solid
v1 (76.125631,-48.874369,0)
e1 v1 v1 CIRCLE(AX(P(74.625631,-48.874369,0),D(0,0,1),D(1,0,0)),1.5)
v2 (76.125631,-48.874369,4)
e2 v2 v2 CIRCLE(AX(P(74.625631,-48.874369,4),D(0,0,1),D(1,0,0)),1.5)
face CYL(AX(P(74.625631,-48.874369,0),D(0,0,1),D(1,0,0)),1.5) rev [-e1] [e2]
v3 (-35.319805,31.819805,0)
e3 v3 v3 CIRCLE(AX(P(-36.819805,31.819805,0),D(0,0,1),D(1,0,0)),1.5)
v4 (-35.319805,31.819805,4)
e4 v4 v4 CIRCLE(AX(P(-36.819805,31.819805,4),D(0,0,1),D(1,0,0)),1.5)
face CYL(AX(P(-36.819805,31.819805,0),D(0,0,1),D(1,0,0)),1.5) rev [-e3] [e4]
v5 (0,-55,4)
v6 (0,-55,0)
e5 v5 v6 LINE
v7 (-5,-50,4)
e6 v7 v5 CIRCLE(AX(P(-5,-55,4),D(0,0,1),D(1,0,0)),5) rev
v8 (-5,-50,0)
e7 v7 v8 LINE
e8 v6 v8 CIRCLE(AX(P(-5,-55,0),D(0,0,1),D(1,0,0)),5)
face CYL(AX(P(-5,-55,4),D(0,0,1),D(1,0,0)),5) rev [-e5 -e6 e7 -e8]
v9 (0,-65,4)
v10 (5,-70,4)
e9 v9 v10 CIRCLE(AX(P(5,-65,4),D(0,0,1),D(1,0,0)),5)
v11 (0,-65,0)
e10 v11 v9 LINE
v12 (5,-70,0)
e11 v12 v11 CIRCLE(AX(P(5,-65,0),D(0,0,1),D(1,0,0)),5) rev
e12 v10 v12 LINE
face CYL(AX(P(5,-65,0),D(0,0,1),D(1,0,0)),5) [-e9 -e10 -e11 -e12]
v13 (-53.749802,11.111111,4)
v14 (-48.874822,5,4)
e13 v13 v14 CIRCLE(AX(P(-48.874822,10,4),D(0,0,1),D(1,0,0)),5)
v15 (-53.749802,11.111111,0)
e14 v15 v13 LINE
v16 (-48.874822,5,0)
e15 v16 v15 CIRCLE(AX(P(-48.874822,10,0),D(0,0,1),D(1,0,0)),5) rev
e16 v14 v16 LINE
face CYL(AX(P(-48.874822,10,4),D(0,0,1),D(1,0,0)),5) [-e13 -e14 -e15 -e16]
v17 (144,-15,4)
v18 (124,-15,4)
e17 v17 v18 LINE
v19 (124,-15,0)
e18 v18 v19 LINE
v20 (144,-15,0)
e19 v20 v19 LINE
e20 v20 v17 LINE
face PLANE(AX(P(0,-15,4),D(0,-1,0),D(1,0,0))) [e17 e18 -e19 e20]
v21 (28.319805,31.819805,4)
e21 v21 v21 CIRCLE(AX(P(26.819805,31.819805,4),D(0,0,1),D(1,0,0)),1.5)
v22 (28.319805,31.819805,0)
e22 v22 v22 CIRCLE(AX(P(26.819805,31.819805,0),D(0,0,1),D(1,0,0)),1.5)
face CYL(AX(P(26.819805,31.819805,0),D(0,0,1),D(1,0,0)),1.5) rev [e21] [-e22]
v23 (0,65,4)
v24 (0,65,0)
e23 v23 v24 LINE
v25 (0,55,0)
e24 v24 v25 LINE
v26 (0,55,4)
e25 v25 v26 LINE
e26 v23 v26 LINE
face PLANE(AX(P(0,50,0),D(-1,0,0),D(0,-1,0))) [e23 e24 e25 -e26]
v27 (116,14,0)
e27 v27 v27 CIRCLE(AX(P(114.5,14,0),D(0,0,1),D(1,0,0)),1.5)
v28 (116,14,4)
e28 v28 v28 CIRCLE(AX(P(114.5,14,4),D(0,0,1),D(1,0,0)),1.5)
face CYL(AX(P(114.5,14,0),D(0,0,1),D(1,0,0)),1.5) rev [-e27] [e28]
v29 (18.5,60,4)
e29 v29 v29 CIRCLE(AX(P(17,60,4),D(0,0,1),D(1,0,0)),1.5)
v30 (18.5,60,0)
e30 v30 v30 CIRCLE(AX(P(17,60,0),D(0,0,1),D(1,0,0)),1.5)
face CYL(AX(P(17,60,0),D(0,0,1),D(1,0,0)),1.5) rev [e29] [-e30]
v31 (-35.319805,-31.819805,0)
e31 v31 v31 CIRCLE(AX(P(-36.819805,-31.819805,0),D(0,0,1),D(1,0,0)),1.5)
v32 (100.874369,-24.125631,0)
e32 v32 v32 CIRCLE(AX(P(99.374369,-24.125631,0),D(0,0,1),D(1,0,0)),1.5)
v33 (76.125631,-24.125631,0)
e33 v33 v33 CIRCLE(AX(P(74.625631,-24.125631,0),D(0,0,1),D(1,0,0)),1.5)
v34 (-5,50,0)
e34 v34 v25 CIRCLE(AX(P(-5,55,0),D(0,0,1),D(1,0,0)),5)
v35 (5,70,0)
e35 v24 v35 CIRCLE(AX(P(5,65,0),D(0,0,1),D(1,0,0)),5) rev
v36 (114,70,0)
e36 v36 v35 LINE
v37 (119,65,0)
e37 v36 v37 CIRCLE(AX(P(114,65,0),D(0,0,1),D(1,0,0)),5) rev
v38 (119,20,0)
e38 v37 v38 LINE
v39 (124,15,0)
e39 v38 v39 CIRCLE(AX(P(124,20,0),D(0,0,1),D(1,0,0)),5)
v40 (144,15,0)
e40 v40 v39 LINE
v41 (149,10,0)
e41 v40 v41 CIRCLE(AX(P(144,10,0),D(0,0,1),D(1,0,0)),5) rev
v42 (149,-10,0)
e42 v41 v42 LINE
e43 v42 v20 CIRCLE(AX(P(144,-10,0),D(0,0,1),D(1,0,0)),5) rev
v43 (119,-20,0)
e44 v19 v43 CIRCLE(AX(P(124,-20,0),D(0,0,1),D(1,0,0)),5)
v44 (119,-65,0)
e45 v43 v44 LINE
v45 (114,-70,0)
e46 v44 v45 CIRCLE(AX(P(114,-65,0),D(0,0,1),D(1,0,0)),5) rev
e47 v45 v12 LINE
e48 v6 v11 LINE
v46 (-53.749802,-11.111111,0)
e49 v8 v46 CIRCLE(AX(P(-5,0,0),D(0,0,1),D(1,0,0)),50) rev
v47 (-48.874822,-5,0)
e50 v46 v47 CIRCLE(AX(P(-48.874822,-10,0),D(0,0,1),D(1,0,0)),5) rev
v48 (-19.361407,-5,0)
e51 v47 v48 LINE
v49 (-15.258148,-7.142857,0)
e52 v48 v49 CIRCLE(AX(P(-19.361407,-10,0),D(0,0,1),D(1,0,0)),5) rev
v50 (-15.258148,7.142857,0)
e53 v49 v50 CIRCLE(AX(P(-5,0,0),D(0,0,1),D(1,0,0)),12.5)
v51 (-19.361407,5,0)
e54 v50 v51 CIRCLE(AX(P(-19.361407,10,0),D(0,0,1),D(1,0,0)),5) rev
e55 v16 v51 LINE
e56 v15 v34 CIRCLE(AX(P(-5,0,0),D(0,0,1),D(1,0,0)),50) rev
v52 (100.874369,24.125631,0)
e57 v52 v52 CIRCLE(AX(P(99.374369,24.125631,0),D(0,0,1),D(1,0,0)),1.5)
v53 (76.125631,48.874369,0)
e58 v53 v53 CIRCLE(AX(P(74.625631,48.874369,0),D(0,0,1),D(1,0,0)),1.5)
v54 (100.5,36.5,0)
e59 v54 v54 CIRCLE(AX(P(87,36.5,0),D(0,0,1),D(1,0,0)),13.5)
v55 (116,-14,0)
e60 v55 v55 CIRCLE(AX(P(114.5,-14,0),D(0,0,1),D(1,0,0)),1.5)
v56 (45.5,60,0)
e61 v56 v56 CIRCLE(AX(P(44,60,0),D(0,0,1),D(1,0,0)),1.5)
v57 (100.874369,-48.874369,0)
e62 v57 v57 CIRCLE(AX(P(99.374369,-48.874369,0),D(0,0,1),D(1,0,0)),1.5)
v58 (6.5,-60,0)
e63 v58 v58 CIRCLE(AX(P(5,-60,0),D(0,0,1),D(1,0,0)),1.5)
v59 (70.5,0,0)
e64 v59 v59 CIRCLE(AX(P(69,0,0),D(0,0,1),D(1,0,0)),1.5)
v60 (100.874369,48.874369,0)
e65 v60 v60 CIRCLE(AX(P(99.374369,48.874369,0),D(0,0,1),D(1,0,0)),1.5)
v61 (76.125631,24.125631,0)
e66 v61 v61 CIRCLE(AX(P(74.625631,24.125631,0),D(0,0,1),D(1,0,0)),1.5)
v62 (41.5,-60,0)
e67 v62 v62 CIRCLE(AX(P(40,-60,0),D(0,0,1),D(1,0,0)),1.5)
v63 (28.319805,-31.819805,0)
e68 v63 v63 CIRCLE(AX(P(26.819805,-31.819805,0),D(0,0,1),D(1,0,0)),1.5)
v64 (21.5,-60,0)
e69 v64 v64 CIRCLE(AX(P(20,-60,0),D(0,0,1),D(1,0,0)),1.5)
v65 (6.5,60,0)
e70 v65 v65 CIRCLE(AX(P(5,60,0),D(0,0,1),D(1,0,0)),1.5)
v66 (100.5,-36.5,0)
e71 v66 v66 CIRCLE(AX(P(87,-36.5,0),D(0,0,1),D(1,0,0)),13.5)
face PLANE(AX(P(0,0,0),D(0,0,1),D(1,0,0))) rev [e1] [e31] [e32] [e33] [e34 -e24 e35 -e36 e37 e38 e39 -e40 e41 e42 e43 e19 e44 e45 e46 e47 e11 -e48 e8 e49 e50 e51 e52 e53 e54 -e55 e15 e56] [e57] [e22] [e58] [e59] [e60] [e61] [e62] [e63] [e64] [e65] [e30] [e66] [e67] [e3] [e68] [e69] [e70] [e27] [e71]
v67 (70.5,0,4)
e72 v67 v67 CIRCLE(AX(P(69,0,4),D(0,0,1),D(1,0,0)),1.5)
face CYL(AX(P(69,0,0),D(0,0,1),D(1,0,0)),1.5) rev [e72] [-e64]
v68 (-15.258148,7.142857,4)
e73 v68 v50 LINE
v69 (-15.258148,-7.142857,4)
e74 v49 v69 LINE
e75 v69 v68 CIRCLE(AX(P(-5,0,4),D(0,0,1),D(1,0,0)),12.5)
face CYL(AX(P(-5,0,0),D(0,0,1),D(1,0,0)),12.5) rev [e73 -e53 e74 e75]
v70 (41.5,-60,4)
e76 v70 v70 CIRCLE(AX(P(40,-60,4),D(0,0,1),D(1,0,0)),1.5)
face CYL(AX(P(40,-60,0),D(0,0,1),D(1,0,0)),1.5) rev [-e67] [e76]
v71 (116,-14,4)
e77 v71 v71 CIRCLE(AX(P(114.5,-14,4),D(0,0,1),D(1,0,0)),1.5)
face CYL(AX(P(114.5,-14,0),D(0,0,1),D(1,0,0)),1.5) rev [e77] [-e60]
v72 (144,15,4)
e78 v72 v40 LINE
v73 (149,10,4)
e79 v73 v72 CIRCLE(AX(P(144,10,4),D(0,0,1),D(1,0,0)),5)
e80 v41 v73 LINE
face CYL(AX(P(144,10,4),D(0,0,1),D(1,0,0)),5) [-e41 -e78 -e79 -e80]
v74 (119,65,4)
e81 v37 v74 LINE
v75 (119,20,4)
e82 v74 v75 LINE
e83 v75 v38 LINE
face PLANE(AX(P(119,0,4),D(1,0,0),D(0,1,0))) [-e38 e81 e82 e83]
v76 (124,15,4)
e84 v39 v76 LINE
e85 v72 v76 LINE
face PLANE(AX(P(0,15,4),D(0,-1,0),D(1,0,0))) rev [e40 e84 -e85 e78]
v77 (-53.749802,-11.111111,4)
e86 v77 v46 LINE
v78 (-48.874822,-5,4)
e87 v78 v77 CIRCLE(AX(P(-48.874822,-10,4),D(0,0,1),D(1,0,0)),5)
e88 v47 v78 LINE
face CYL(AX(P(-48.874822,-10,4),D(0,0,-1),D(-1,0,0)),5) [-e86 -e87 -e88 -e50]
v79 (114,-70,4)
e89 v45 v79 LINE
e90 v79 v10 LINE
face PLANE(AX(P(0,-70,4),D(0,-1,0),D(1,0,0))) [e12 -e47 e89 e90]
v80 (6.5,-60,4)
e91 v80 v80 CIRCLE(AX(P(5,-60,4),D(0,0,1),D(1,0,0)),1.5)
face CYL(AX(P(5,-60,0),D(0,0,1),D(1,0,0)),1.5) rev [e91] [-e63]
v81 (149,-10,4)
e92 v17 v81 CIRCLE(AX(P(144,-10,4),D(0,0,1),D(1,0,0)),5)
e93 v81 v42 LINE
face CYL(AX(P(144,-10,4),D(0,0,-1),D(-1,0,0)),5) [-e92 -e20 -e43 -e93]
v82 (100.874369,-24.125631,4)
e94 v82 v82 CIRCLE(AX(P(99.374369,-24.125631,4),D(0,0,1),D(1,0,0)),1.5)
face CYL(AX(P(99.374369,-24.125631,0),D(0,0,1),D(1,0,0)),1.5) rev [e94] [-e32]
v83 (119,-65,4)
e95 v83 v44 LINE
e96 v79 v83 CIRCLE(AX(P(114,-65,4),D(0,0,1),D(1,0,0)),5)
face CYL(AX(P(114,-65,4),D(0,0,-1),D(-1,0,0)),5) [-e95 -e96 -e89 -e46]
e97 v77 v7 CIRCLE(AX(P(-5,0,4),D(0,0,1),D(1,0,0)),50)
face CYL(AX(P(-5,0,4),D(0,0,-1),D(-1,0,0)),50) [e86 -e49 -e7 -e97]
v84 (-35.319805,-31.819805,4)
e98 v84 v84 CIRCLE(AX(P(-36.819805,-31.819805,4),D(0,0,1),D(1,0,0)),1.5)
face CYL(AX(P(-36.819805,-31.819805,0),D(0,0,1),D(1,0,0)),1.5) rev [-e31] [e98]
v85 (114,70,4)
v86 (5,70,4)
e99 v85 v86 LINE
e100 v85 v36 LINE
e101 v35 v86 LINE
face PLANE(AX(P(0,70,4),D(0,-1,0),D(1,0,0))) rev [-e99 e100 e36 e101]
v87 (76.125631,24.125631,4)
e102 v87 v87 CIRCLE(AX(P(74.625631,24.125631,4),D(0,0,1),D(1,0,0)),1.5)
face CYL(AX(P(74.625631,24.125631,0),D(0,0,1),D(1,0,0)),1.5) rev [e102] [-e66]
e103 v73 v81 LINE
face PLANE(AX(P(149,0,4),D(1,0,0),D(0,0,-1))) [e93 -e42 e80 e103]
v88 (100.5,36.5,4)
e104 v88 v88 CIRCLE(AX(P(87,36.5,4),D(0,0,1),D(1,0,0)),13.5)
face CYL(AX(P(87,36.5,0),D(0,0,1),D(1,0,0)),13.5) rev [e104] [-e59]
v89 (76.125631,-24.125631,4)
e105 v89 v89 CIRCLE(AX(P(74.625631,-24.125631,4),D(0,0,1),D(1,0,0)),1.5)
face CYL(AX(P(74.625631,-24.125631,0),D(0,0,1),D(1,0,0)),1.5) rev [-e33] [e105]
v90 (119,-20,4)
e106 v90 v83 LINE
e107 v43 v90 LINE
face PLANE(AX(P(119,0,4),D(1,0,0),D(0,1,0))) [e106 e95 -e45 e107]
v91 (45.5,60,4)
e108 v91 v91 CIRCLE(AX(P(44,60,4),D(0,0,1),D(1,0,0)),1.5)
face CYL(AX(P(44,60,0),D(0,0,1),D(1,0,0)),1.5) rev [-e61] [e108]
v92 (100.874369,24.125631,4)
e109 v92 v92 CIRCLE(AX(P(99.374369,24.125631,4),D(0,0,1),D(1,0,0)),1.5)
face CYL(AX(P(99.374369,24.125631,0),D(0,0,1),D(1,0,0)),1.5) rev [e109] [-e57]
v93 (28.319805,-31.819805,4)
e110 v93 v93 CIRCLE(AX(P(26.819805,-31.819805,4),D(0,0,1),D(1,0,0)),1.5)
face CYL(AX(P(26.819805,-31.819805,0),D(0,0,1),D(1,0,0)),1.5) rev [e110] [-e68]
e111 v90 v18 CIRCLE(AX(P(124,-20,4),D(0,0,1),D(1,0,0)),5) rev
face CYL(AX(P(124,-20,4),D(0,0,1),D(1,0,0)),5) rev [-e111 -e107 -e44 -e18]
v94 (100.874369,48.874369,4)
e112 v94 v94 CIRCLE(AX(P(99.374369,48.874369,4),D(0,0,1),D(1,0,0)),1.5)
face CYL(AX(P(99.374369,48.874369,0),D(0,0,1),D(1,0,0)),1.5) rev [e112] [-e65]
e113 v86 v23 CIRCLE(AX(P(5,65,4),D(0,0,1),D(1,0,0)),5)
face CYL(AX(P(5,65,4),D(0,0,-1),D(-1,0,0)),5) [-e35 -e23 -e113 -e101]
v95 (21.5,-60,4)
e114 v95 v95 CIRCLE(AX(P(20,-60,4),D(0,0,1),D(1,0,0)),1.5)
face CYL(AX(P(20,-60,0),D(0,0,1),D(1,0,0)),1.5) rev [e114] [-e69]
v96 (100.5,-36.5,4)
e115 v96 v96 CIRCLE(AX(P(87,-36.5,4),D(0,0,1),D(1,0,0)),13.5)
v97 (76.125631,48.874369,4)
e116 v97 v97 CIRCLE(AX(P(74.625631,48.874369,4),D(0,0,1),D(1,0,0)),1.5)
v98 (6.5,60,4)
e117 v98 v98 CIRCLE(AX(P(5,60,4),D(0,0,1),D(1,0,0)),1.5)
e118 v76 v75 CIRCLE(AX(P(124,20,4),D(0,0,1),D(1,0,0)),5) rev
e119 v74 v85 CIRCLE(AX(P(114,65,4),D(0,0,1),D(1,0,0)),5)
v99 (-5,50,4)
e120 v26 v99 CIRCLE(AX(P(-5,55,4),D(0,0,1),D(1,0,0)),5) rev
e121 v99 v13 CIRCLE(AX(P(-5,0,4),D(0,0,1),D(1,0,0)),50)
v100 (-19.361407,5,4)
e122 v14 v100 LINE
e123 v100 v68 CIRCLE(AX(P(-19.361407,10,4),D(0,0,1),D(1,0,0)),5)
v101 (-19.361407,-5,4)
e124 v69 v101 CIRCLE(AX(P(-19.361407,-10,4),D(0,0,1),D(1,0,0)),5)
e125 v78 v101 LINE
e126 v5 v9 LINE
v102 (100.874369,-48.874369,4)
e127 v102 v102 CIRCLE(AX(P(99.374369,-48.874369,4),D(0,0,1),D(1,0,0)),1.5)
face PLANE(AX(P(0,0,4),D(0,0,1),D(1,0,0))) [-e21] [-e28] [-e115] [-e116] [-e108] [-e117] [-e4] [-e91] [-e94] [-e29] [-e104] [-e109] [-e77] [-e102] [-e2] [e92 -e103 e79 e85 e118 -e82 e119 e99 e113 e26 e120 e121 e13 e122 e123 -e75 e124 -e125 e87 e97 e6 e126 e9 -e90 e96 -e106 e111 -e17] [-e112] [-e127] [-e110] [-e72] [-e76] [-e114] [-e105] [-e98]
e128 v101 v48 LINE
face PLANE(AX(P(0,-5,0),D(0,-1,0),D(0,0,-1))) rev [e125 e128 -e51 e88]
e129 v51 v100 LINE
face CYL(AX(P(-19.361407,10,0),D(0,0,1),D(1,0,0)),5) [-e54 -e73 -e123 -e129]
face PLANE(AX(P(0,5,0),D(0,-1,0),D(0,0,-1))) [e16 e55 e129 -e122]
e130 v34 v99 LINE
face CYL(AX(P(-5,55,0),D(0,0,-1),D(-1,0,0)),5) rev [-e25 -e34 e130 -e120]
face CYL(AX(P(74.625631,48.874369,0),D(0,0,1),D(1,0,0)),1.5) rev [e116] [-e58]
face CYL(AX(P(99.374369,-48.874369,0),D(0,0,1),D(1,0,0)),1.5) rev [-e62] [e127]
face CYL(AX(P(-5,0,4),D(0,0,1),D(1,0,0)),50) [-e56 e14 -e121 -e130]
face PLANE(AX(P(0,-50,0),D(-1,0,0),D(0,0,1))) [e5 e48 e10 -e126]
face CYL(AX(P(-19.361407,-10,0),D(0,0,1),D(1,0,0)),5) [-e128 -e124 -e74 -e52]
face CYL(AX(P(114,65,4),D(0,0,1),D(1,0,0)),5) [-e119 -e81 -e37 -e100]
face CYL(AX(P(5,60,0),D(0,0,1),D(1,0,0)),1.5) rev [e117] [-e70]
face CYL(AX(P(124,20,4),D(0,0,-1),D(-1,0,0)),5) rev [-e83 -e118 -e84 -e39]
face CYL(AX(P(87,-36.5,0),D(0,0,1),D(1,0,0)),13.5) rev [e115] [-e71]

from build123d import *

# Parameters (mm, degrees)
SKETCH_1_W          = 110
SKETCH_1_H          = 100
SKETCH_1_W_2        = 30
SKETCH_1_H_2        = 30
EXTRUDE_1_DEPTH     = 4
FILLET_1_R          = 50
SKETCH_2_R          = 13.5
SKETCH_2_R_2        = 1.5
CUT_EXTRUDE_1_DEPTH = 4
SKETCH_4_W          = 55
SKETCH_4_H          = 20
EXTRUDE_2_DEPTH     = 4
FILLET_2_R          = 5
SKETCH_5_R          = 1.5
CUT_EXTRUDE_2_DEPTH = 4


with BuildPart() as part:
    # 草图1 → 凸台-拉伸1 (new body)
    with BuildSketch(Plane.XY):
        Rectangle(SKETCH_1_W, SKETCH_1_H)
        Polygon((55, 70), (55, 50), (55, -50), (55, -70), (119, -70), (119, -15), (119, 15), (119, 70), align=None)
        with Locations((134, 0)):
            Rectangle(SKETCH_1_W_2, SKETCH_1_H_2)
    extrude(amount=EXTRUDE_1_DEPTH)

    # 圆角1
    fillet_1_edges = [part.edges().sort_by_distance(p)[0] for p in [
        (-55, -50, 2),
        (-55, 50, 2),
    ]]
    fillet(fillet_1_edges, radius=FILLET_1_R - 0.0001)  # a hair under: the kernel refuses the full size

    # 草图2 → 切除-拉伸1 (cut)
    with BuildSketch(Plane.XY.offset(4)):
        with BuildLine():
            ThreePointArc((7.5, 0), (-2.446129454, 12.236328912), (-16.456439237, 5))
            Line((-16.456439237, 5), (-7.5, 5))
            Line((-7.5, 5), (-7.5, -5))
            Line((-7.5, -5), (-16.456439237, -5))
            ThreePointArc((-16.456439237, -5), (-2.446129454, -12.236328912), (7.5, 0))
        make_face()
        with BuildLine():
            Line((-7.5, 5), (-16.456439237, 5))
            ThreePointArc((-16.456439237, 5), (-17.5, 0), (-16.456439237, -5))
            Line((-16.456439237, -5), (-7.5, -5))
            Line((-7.5, -5), (-7.5, 5))
        make_face()
        with BuildLine():
            Line((-16.456439237, 5), (-27.5, 5))
            Line((-27.5, 5), (-27.5, -5))
            Line((-27.5, -5), (-16.456439237, -5))
            ThreePointArc((-16.456439237, -5), (-17.5, 0), (-16.456439237, 5))
        make_face()
        with Locations((87, 36.5)):
            Circle(SKETCH_2_R)
        with Locations((99.374368671, 24.125631329)):
            Circle(SKETCH_2_R_2)
        with Locations((74.625631329, 24.125631329)):
            Circle(SKETCH_2_R_2)
        with Locations((74.625631329, 48.874368671)):
            Circle(SKETCH_2_R_2)
        with Locations((99.374368671, 48.874368671)):
            Circle(SKETCH_2_R_2)
        with Locations((87, -36.5)):
            Circle(SKETCH_2_R)
        with Locations((74.625631329, -24.125631329)):
            Circle(SKETCH_2_R_2)
        with Locations((99.374368671, -24.125631329)):
            Circle(SKETCH_2_R_2)
        with Locations((99.374368671, -48.874368671)):
            Circle(SKETCH_2_R_2)
        with BuildLine():
            ThreePointArc((-55, 0), (-54.937303656, 2.503138753), (-54.749371855, 5))
            Line((-54.749371855, 5), (-85.65404948, 5))
            Line((-85.65404948, 5), (-85.65404948, -5))
            Line((-85.65404948, -5), (-54.749371855, -5))
            ThreePointArc((-54.749371855, -5), (-54.937303656, -2.503138753), (-55, 0))
        make_face()
        with BuildLine():
            Line((-27.5, -5), (-27.5, 5))
            Line((-27.5, 5), (-54.749371855, 5))
            ThreePointArc((-54.749371855, 5), (-54.937303656, 2.503138753), (-55, 0))
            ThreePointArc((-55, 0), (-54.937303656, -2.503138753), (-54.749371855, -5))
            Line((-54.749371855, -5), (-27.5, -5))
        make_face()
        with Locations((74.625631329, -48.874368671)):
            Circle(SKETCH_2_R_2)
    extrude(amount=-CUT_EXTRUDE_1_DEPTH, mode=Mode.SUBTRACT)

    # 草图4 → 凸台-拉伸2 (add)
    with BuildSketch(Plane.XY.offset(4)):
        with Locations((27.5, 60)):
            Rectangle(SKETCH_4_W, SKETCH_4_H)
        with Locations((27.5, -60)):
            Rectangle(SKETCH_4_W, SKETCH_4_H)
    extrude(amount=-EXTRUDE_2_DEPTH)

    # 圆角2
    fillet_2_edges = [part.edges().sort_by_distance(p)[0] for p in [
        (0, -70, 2),
        (119, -70, 2),
        (119, -15, 2),
        (149, -15, 2),
        (149, 15, 2),
        (119, 15, 2),
        (119, 70, 2),
        (0, 50, 2),
        (-54.749381402, 5, 2),
        (-16.456439237, 5, 2),
        (-16.456439237, -5, 2),
        (-54.749381402, -5, 2),
        (0, -50, 2),
        (0, 70, 2),
    ]]
    fillet(fillet_2_edges, radius=FILLET_2_R)

    # 草图5 → 切除-拉伸2 (cut)
    with BuildSketch(Plane.XY.offset(4)):
        with Locations((114.5, 14)):
            Circle(SKETCH_5_R)
        with Locations((114.5, -14)):
            Circle(SKETCH_5_R)
        with Locations((69, 0)):
            Circle(SKETCH_5_R)
        with Locations((-36.819805153, 31.819805153)):
            Circle(SKETCH_5_R)
        with Locations((26.819805153, 31.819805153)):
            Circle(SKETCH_5_R)
        with Locations((26.819805153, -31.819805153)):
            Circle(SKETCH_5_R)
        with Locations((-36.819805153, -31.819805153)):
            Circle(SKETCH_5_R)
        with Locations((5, -60)):
            Circle(SKETCH_5_R)
        with Locations((20, -60)):
            Circle(SKETCH_5_R)
        with Locations((40, -60)):
            Circle(SKETCH_5_R)
        with Locations((5, 60)):
            Circle(SKETCH_5_R)
        with Locations((17, 60)):
            Circle(SKETCH_5_R)
        with Locations((44, 60)):
            Circle(SKETCH_5_R)
    extrude(amount=-CUT_EXTRUDE_2_DEPTH, mode=Mode.SUBTRACT)


solid = part.part
